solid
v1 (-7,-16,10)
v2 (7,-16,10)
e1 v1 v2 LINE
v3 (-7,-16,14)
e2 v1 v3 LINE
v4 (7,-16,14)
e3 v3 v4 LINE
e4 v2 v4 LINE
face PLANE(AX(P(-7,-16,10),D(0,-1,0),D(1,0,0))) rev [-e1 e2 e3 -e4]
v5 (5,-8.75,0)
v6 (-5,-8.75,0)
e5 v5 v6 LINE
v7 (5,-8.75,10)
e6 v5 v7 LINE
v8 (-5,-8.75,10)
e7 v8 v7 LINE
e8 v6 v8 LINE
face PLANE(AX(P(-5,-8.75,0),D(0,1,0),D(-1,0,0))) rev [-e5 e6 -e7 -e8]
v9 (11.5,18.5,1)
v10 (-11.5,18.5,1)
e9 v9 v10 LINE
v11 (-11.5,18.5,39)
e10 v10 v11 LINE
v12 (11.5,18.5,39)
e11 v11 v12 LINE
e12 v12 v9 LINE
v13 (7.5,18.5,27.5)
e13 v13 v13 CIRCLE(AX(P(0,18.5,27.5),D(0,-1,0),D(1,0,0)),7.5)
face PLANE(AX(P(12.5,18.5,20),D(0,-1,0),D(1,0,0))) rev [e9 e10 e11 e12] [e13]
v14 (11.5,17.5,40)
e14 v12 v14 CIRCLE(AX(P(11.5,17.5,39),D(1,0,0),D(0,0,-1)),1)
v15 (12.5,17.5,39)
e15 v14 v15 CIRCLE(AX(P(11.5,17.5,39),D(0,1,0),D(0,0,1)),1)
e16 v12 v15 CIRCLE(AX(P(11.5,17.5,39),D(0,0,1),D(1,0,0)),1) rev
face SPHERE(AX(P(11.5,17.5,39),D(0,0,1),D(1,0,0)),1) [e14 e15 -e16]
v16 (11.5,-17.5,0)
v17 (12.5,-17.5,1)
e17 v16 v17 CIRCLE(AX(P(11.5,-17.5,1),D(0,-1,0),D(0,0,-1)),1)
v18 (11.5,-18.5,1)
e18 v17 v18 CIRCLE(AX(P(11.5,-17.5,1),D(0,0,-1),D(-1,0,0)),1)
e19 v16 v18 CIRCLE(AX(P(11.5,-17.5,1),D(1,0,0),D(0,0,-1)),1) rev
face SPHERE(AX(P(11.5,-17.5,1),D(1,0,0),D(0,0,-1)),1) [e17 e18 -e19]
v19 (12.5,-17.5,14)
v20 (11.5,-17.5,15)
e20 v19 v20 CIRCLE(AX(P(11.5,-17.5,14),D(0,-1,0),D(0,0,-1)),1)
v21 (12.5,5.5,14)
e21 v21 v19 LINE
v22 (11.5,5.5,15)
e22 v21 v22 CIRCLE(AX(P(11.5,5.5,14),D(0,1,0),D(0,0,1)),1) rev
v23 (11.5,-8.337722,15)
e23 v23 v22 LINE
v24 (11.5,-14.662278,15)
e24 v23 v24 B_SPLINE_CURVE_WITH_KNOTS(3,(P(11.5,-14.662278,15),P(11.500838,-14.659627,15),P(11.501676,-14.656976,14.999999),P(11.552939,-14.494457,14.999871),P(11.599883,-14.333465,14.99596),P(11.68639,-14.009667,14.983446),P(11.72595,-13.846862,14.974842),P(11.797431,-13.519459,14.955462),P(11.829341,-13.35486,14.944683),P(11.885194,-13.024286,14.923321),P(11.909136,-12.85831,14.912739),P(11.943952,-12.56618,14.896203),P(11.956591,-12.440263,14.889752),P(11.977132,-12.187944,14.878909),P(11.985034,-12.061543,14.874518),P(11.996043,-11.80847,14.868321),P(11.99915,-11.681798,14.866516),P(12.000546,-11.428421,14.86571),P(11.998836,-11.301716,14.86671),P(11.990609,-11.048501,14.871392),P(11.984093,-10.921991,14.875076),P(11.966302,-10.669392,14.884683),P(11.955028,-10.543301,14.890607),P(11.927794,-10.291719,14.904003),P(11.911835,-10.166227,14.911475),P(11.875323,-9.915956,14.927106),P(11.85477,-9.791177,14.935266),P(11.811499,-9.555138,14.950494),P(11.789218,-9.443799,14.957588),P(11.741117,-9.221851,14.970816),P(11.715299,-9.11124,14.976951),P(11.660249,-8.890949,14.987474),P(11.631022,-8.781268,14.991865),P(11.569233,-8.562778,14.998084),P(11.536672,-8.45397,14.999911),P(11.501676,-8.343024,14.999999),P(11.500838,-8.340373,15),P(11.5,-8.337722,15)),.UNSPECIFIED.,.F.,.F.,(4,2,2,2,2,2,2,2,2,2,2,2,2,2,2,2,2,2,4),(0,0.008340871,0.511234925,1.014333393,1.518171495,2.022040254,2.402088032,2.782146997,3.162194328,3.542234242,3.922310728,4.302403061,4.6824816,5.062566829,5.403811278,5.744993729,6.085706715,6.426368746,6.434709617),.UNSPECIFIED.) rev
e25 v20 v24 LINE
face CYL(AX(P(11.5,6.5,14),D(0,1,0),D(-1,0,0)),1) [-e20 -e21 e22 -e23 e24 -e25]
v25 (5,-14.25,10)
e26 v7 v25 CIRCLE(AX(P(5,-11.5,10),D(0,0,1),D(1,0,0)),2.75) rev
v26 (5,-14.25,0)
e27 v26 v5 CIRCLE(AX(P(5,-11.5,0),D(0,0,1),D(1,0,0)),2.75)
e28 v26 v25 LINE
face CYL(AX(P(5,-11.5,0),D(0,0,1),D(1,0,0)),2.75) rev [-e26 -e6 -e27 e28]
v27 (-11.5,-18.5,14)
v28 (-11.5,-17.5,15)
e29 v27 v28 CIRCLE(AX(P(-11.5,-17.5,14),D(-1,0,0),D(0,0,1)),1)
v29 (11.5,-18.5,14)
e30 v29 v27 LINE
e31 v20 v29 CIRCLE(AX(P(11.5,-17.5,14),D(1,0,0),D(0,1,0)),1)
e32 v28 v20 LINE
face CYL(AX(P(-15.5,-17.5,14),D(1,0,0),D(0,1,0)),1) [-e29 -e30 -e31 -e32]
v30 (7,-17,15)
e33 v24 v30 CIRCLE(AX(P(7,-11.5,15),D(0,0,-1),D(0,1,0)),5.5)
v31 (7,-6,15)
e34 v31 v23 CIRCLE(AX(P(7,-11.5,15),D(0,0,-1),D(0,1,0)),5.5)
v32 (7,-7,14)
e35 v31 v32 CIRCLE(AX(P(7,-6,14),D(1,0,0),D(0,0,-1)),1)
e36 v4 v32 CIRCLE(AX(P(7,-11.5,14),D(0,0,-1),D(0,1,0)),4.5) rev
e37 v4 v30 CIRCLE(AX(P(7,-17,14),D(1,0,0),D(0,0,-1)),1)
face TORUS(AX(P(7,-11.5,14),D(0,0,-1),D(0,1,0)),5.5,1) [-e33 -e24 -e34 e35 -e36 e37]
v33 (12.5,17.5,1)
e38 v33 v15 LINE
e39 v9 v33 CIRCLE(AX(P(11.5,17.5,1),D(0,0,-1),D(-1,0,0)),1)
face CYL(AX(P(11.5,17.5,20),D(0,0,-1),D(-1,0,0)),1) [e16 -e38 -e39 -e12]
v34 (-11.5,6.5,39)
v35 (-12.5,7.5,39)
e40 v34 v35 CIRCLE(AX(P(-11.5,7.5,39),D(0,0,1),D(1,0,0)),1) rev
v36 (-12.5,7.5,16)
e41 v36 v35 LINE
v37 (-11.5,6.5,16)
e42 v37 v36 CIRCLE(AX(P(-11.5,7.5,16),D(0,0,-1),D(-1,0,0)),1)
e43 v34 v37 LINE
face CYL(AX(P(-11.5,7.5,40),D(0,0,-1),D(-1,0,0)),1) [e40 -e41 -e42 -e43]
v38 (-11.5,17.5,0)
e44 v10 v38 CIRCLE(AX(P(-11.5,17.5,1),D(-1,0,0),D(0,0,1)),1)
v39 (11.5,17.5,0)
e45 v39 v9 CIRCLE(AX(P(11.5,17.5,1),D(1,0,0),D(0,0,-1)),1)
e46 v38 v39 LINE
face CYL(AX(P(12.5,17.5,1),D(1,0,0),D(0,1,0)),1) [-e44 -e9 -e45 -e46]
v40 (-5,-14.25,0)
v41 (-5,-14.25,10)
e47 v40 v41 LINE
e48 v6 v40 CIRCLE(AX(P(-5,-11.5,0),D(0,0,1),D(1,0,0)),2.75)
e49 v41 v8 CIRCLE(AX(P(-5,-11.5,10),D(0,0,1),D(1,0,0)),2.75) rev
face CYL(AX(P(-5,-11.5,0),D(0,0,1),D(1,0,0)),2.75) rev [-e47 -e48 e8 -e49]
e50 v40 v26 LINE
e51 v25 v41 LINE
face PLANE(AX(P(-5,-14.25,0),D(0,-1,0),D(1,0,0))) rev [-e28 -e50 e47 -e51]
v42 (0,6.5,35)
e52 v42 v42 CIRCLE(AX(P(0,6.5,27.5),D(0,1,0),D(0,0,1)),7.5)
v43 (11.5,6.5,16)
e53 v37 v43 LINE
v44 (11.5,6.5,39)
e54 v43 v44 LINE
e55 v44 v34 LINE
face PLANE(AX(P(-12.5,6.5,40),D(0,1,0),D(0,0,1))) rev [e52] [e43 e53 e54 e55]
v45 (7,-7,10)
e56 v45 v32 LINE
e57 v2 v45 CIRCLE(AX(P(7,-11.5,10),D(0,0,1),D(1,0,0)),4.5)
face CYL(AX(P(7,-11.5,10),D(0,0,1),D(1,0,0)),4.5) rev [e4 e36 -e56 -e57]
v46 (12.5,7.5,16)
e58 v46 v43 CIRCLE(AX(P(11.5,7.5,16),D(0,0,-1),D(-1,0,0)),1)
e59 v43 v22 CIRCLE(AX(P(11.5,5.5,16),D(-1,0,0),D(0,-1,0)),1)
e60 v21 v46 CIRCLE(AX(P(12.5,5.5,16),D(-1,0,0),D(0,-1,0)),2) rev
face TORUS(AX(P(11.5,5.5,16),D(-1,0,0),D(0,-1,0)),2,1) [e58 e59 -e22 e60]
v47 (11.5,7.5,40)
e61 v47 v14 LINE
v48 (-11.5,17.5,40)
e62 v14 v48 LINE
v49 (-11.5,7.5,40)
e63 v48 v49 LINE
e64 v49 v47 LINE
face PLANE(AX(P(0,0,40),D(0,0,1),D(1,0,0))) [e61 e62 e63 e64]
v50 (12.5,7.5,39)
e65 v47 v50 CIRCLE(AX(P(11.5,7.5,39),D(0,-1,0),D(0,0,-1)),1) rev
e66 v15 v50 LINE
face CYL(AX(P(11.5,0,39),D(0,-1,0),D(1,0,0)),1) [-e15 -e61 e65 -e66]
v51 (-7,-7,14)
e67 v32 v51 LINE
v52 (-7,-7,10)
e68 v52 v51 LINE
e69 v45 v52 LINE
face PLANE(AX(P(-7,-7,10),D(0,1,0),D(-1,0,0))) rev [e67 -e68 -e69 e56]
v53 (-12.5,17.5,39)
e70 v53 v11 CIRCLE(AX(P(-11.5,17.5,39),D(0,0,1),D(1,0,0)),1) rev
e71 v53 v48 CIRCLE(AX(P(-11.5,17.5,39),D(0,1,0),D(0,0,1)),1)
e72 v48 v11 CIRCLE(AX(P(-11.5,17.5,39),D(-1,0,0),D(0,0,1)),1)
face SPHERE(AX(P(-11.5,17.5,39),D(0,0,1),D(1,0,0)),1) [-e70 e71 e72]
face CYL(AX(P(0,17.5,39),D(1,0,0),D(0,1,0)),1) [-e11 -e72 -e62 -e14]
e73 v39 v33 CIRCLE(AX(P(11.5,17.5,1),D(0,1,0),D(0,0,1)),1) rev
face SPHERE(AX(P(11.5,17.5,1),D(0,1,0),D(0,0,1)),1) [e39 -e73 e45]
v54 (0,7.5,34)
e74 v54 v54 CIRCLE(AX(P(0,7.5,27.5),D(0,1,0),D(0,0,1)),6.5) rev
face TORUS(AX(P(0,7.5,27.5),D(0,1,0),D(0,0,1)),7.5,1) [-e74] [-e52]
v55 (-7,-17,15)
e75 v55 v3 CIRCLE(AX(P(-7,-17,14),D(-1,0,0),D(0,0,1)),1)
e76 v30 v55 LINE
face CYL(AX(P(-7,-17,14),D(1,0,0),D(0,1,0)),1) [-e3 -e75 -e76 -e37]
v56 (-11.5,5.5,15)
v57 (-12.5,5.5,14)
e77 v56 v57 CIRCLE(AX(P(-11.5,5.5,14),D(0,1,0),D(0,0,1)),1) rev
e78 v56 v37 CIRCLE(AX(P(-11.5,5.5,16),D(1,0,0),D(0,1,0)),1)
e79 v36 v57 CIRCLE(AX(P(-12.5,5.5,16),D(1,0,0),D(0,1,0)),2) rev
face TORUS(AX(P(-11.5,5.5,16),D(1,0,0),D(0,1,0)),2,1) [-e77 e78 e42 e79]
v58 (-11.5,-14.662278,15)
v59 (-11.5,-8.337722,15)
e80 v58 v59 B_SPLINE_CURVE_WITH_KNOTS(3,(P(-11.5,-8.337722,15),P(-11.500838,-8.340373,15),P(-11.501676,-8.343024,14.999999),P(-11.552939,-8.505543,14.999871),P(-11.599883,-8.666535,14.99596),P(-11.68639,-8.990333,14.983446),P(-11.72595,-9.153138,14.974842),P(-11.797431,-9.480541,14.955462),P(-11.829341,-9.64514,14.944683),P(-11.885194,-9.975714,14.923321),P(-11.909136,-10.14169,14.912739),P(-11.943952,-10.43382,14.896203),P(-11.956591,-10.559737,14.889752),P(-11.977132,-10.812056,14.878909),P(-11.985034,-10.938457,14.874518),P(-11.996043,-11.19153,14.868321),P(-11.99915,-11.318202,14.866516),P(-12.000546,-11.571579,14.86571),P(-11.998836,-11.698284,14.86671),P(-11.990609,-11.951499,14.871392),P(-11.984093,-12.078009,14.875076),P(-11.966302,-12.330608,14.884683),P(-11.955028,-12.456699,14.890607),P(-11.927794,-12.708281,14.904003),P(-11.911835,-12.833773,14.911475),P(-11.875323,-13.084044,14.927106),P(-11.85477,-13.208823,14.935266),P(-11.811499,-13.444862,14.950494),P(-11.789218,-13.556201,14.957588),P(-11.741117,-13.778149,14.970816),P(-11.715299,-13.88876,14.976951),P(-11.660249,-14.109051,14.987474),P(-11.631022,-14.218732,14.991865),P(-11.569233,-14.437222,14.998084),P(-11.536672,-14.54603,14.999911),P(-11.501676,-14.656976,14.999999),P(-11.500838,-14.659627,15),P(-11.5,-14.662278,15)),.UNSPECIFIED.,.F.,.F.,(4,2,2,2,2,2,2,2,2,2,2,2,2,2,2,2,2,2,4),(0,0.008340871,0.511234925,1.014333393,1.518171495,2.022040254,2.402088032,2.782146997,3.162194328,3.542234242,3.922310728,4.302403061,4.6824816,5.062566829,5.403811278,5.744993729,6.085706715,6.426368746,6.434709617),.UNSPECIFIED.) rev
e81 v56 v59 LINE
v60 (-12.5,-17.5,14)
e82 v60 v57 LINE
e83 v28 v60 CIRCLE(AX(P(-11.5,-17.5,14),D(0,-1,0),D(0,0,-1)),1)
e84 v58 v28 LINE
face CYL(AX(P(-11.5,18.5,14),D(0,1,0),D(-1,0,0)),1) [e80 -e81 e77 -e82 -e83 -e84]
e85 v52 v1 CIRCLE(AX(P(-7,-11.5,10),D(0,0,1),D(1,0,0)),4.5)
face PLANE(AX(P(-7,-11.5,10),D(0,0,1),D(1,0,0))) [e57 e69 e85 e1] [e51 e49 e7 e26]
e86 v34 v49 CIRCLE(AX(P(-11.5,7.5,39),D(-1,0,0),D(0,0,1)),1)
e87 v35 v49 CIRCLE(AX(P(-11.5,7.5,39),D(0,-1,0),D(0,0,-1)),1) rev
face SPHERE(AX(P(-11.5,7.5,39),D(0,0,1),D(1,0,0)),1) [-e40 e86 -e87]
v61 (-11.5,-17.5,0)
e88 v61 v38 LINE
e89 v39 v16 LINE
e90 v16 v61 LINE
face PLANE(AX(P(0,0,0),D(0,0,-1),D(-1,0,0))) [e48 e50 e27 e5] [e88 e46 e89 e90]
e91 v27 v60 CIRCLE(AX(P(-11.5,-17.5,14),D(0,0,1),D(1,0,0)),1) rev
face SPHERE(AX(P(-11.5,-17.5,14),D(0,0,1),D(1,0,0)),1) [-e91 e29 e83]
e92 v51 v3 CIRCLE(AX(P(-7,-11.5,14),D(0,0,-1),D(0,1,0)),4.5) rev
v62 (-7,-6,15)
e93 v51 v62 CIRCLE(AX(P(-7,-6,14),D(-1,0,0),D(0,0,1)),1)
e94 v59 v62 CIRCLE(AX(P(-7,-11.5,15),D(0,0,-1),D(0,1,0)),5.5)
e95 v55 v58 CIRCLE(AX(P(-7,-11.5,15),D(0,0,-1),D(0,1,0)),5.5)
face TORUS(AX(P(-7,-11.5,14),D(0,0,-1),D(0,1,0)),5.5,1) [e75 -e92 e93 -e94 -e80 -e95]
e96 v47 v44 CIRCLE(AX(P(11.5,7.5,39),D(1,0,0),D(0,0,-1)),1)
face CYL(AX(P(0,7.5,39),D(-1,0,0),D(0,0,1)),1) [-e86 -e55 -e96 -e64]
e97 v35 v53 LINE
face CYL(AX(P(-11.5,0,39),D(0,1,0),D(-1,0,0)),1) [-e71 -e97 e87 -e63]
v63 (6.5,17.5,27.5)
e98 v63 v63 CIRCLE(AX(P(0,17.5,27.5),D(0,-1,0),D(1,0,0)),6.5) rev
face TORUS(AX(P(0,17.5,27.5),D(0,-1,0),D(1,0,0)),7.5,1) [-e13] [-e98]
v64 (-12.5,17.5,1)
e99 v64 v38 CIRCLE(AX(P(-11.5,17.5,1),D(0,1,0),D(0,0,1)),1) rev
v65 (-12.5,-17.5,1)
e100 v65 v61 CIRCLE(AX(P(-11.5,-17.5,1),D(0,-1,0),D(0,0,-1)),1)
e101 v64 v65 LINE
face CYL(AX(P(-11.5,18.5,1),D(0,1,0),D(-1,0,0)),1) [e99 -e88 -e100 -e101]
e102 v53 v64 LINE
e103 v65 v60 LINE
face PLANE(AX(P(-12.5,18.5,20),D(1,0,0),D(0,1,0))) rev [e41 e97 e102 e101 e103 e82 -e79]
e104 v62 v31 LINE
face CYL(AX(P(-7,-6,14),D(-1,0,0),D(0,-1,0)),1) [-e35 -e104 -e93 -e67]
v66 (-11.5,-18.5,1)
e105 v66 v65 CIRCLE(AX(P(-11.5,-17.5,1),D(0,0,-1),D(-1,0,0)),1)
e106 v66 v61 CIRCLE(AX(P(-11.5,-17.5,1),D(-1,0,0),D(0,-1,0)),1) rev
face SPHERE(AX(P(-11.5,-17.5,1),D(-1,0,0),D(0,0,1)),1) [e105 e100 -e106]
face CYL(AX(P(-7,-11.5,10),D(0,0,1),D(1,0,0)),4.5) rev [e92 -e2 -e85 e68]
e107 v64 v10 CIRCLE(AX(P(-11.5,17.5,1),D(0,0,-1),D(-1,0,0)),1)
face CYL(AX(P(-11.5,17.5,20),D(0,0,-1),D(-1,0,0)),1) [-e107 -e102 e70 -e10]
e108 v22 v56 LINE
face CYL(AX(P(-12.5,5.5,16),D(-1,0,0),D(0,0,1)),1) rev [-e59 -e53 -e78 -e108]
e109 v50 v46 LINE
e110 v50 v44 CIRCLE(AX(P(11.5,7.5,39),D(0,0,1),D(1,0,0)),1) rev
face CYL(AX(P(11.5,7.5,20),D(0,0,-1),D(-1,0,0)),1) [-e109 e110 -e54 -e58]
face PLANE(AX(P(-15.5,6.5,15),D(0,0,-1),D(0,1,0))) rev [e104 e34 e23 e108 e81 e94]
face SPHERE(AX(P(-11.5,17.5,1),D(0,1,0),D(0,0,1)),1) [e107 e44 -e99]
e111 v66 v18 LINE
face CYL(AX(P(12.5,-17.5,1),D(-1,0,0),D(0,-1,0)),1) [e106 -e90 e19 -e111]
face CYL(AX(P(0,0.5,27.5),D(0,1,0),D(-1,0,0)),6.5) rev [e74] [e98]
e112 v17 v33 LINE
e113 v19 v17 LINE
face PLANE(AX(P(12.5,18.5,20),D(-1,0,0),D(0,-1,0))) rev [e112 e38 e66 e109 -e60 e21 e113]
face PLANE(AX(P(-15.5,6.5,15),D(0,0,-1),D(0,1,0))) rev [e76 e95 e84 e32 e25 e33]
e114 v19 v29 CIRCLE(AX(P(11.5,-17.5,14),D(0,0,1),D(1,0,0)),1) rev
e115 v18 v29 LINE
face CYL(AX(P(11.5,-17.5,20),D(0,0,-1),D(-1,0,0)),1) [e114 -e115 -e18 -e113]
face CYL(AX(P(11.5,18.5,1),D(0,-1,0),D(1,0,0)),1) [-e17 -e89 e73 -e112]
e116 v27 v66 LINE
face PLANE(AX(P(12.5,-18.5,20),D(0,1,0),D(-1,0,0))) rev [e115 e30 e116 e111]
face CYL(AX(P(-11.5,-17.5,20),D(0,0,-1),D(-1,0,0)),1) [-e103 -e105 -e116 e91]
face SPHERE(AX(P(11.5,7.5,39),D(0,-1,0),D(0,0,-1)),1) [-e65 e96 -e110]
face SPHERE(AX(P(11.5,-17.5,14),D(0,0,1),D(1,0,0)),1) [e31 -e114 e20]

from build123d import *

# Parameters (mm, degrees)
CROQUIS1_W              = 25
CROQUIS1_H              = 37
SALIENTE_EXTRUIR1_DEPTH = 20
CROQUIS2_W              = 25
CROQUIS2_H              = 12
SALIENTE_EXTRUIR2_DEPTH = 20
CORTAR_EXTRUIR1_DEPTH   = 20
CORTAR_EXTRUIR2_DEPTH   = 10
CROQUIS5_R              = 6.5
CORTAR_EXTRUIR3_DEPTH   = 18
CROQUIS6_W              = 5
CROQUIS6_H              = 25
CORTAR_EXTRUIR4_DEPTH   = 28
REDONDEO1_R             = 1


with BuildPart() as part:
    # Croquis1 → Saliente-Extruir1 (new body)
    with BuildSketch(Plane.XY):
        Rectangle(CROQUIS1_W, CROQUIS1_H)
    extrude(amount=SALIENTE_EXTRUIR1_DEPTH)

    # Croquis2 → Saliente-Extruir2 (add)
    with BuildSketch(Plane.XY.offset(20)):
        with Locations((0, 12.5)):
            Rectangle(CROQUIS2_W, CROQUIS2_H)
    extrude(amount=SALIENTE_EXTRUIR2_DEPTH)

    # Croquis3 → Cortar-Extruir1 (cut)
    with BuildSketch(Plane.XY.offset(20)):
        with BuildLine():
            Line((-5, -8.75), (5, -8.75))
            ThreePointArc((5, -8.75), (7.75, -11.5), (5, -14.25))
            Line((5, -14.25), (-5, -14.25))
            ThreePointArc((-5, -14.25), (-7.75, -11.5), (-5, -8.75))
        make_face()
    extrude(amount=-CORTAR_EXTRUIR1_DEPTH, mode=Mode.SUBTRACT)

    # Croquis4 → Cortar-Extruir2 (cut)
    with BuildSketch(Plane.XY.offset(20)):
        with BuildLine():
            Line((-7, -7), (7, -7))
            ThreePointArc((7, -7), (11.5, -11.5), (7, -16))
            Line((7, -16), (-7, -16))
            ThreePointArc((-7, -16), (-11.5, -11.5), (-7, -7))
        make_face()
    extrude(amount=-CORTAR_EXTRUIR2_DEPTH, mode=Mode.SUBTRACT)

    # Croquis5 → Cortar-Extruir3 (cut)
    with BuildSketch(Plane(origin=(0, 18.5, 0), x_dir=(1, 0, 0), z_dir=(0, 1, 0))):
        with Locations(Location((0, -27.5, 0), (0, 0, 180))):
            Circle(CROQUIS5_R)
    extrude(amount=-CORTAR_EXTRUIR3_DEPTH, mode=Mode.SUBTRACT)

    # Croquis6 → Cortar-Extruir4 (cut)
    with BuildSketch(Plane(origin=(12.5, 0, 0), x_dir=(0, 0, -1), z_dir=(1, 0, 0))):
        with Locations((-17.5, -6)):
            Rectangle(CROQUIS6_W, CROQUIS6_H)
    extrude(amount=-CORTAR_EXTRUIR4_DEPTH, mode=Mode.SUBTRACT)

    # Redondeo1
    # the kernel refuses this fillet: 1 mm, written as the material it adds along each edge
    with BuildSketch(Plane(origin=(12.5, 6.5, 15), x_dir=(0, 0, 1), z_dir=(-1, 0, 0))) as redondeo1_piece_1:
        with BuildLine():
            CenterArc((REDONDEO1_R, -REDONDEO1_R), REDONDEO1_R, 90, 90)
            Line((0, -REDONDEO1_R), (0, 0))
            Line((0, 0), (REDONDEO1_R, 0))
        make_face()
    extrude(amount=25)
    # the kernel refuses this fillet: 1 mm, written as the material it takes off along each edge
    with BuildSketch(Plane(origin=(-11.5, 17.5, 39), x_dir=(0, 0, 1), z_dir=(0, 1, 0))) as redondeo1_2_piece_1_section:
        Polygon((0, 0), (REDONDEO1_R, 0), (REDONDEO1_R, -REDONDEO1_R), (0, -REDONDEO1_R), align=None)
    redondeo1_2_piece_1 = extrude(amount=REDONDEO1_R, mode=Mode.PRIVATE)
    redondeo1_2_piece_1 = redondeo1_2_piece_1 - Plane(origin=(-11.5, 17.5, 39), x_dir=(0.7071067811865475, 0, -0.7071067811865475), z_dir=(0, 1, 0)) * Sphere(REDONDEO1_R, mode=Mode.PRIVATE)
    add(redondeo1_2_piece_1, mode=Mode.SUBTRACT)
    with BuildSketch(Plane(origin=(11.5, 17.5, 39), x_dir=(1, 0, 0), z_dir=(0, 1, 0))) as redondeo1_2_piece_2_section:
        Polygon((0, 0), (REDONDEO1_R, 0), (REDONDEO1_R, -REDONDEO1_R), (0, -REDONDEO1_R), align=None)
    redondeo1_2_piece_2 = extrude(amount=REDONDEO1_R, mode=Mode.PRIVATE)
    redondeo1_2_piece_2 = redondeo1_2_piece_2 - Plane(origin=(11.5, 17.5, 39), x_dir=(-0.7071067811865475, 0, -0.7071067811865475), z_dir=(0, 1, 0)) * Sphere(REDONDEO1_R, mode=Mode.PRIVATE)
    add(redondeo1_2_piece_2, mode=Mode.SUBTRACT)
    with BuildSketch(Plane(origin=(11.5, 17.5, 1), x_dir=(1, 0, 0), z_dir=(0, 1, 0))) as redondeo1_2_piece_3_section:
        Polygon((0, 0), (REDONDEO1_R, 0), (REDONDEO1_R, REDONDEO1_R), (0, REDONDEO1_R), align=None)
    redondeo1_2_piece_3 = extrude(amount=REDONDEO1_R, mode=Mode.PRIVATE)
    redondeo1_2_piece_3 = redondeo1_2_piece_3 - Plane(origin=(11.5, 17.5, 1), x_dir=(-0.7071067811865475, 0, 0.7071067811865475), z_dir=(0, 1, 0)) * Sphere(REDONDEO1_R, mode=Mode.PRIVATE)
    add(redondeo1_2_piece_3, mode=Mode.SUBTRACT)
    with BuildSketch(Plane(origin=(-11.5, 17.5, 1), x_dir=(0, 0, -1), z_dir=(0, 1, 0))) as redondeo1_2_piece_4_section:
        Polygon((0, 0), (REDONDEO1_R, 0), (REDONDEO1_R, REDONDEO1_R), (0, REDONDEO1_R), align=None)
    redondeo1_2_piece_4 = extrude(amount=REDONDEO1_R, mode=Mode.PRIVATE)
    redondeo1_2_piece_4 = redondeo1_2_piece_4 - Plane(origin=(-11.5, 17.5, 1), x_dir=(0.7071067811865475, 0, 0.7071067811865475), z_dir=(0, 1, 0)) * Sphere(REDONDEO1_R, mode=Mode.PRIVATE)
    add(redondeo1_2_piece_4, mode=Mode.SUBTRACT)
    with BuildSketch(Plane(origin=(11.5, -17.5, 1), x_dir=(0, 0, -1), z_dir=(1, 0, 0))) as redondeo1_2_piece_5_section:
        Polygon((0, 0), (REDONDEO1_R, 0), (REDONDEO1_R, -REDONDEO1_R), (0, -REDONDEO1_R), align=None)
    redondeo1_2_piece_5 = extrude(amount=REDONDEO1_R, mode=Mode.PRIVATE)
    redondeo1_2_piece_5 = redondeo1_2_piece_5 - Plane(origin=(11.5, -17.5, 1), x_dir=(0, 0.7071067811865475, 0.7071067811865475), z_dir=(1, 0, 0)) * Sphere(REDONDEO1_R, mode=Mode.PRIVATE)
    add(redondeo1_2_piece_5, mode=Mode.SUBTRACT)
    with BuildSketch(Plane(origin=(-11.5, -17.5, 1), x_dir=(-1, 0, 0), z_dir=(0, 0, -1))) as redondeo1_2_piece_6_section:
        Polygon((0, 0), (REDONDEO1_R, 0), (REDONDEO1_R, -REDONDEO1_R), (0, -REDONDEO1_R), align=None)
    redondeo1_2_piece_6 = extrude(amount=REDONDEO1_R, mode=Mode.PRIVATE)
    redondeo1_2_piece_6 = redondeo1_2_piece_6 - Plane(origin=(-11.5, -17.5, 1), x_dir=(0.7071067811865474, 0.7071067811865477, 0), z_dir=(0, 0, -1)) * Sphere(REDONDEO1_R, mode=Mode.PRIVATE)
    add(redondeo1_2_piece_6, mode=Mode.SUBTRACT)
    with BuildSketch(Plane(origin=(-12.5, 4, 40), x_dir=(1, 0, 0), z_dir=(0, 1, 0))) as redondeo1_2_piece_7:
        with BuildLine():
            CenterArc((REDONDEO1_R, REDONDEO1_R), REDONDEO1_R, 180, 90)
            Line((0, REDONDEO1_R), (0, 0))
            Line((0, 0), (REDONDEO1_R, 0))
        make_face()
    extrude(amount=13.5, mode=Mode.SUBTRACT)
    with BuildSketch(Plane(origin=(15, 6.5, 40), x_dir=(0, 1, 0), z_dir=(-1, 0, 0))) as redondeo1_2_piece_8:
        with BuildLine():
            CenterArc((REDONDEO1_R, REDONDEO1_R), REDONDEO1_R, 180, 90)
            Line((0, REDONDEO1_R), (0, 0))
            Line((0, 0), (REDONDEO1_R, 0))
        make_face()
    extrude(amount=30, mode=Mode.SUBTRACT)
    with BuildSketch(Plane(origin=(12.5, 17.5, 40), x_dir=(0, 0, -1), z_dir=(0, -1, 0))) as redondeo1_2_piece_9:
        with BuildLine():
            CenterArc((REDONDEO1_R, -REDONDEO1_R), REDONDEO1_R, 90, 90)
            Line((0, -REDONDEO1_R), (0, 0))
            Line((0, 0), (REDONDEO1_R, 0))
        make_face()
    extrude(amount=13.5, mode=Mode.SUBTRACT)
    with BuildSketch(Plane(origin=(-11.5, 18.5, 40), x_dir=(0, 0, -1), z_dir=(1, 0, 0)), Plane(origin=(11.5, 18.5, 0), x_dir=(0, 0, 1), z_dir=(-1, 0, 0))) as redondeo1_2_piece_10:
        with BuildLine():
            CenterArc((REDONDEO1_R, -REDONDEO1_R), REDONDEO1_R, 90, 90)
            Line((0, -REDONDEO1_R), (0, 0))
            Line((0, 0), (REDONDEO1_R, 0))
        make_face()
    extrude(amount=23, mode=Mode.SUBTRACT)
    with BuildSketch(Plane(origin=(12.5, -17.5, 0), x_dir=(0, 0, 1), z_dir=(0, 1, 0))) as redondeo1_2_piece_11:
        with BuildLine():
            CenterArc((REDONDEO1_R, -REDONDEO1_R), REDONDEO1_R, 90, 90)
            Line((0, -REDONDEO1_R), (0, 0))
            Line((0, 0), (REDONDEO1_R, 0))
        make_face()
    extrude(amount=35, mode=Mode.SUBTRACT)
    with BuildSketch(Plane(origin=(-11.5, -18.5, 0), x_dir=(0, 1, 0), z_dir=(1, 0, 0))) as redondeo1_2_piece_12:
        with BuildLine():
            CenterArc((REDONDEO1_R, REDONDEO1_R), REDONDEO1_R, 180, 90)
            Line((0, REDONDEO1_R), (0, 0))
            Line((0, 0), (REDONDEO1_R, 0))
        make_face()
    extrude(amount=23, mode=Mode.SUBTRACT)
    with BuildSketch(Plane(origin=(-12.5, 17.5, 0), x_dir=(1, 0, 0), z_dir=(0, -1, 0))) as redondeo1_2_piece_13:
        with BuildLine():
            CenterArc((REDONDEO1_R, REDONDEO1_R), REDONDEO1_R, 180, 90)
            Line((0, REDONDEO1_R), (0, 0))
            Line((0, 0), (REDONDEO1_R, 0))
        make_face()
    extrude(amount=35, mode=Mode.SUBTRACT)
    with BuildSketch(Plane(origin=(0, 6.5, 27.5), x_dir=(-1, 0, 0), z_dir=(0, 0, -1))) as redondeo1_2_piece_14:
        with BuildLine():
            CenterArc((6.5 + REDONDEO1_R, REDONDEO1_R), REDONDEO1_R, 180, 90)
            Line((6.5 + REDONDEO1_R, 0), (6.5, 0))
            Line((6.5, 0), (6.5, REDONDEO1_R))
        make_face()
    revolve(axis=Axis((0, 6.5, 27.5), (0, 1, 0)), mode=Mode.SUBTRACT)
    with BuildSketch(Plane(origin=(0, 18.5, 27.5), x_dir=(-1, 0, 0), z_dir=(0, 0, -1))) as redondeo1_2_piece_15:
        with BuildLine():
            CenterArc((6.5 + REDONDEO1_R, -REDONDEO1_R), REDONDEO1_R, 90, 90)
            Line((6.5, -REDONDEO1_R), (6.5, 0))
            Line((6.5, 0), (6.5 + REDONDEO1_R, 0))
        make_face()
    revolve(axis=Axis((0, 18.5, 27.5), (0, 1, 0)), mode=Mode.SUBTRACT)
    with BuildSketch(Plane(origin=(-12.5, 18.5, 1), x_dir=(1, 0, 0), z_dir=(0, 0, 1)), Plane(origin=(12.5, 18.5, 39), x_dir=(-1, 0, 0), z_dir=(0, 0, -1))) as redondeo1_2_piece_16:
        with BuildLine():
            CenterArc((REDONDEO1_R, -REDONDEO1_R), REDONDEO1_R, 90, 90)
            Line((0, -REDONDEO1_R), (0, 0))
            Line((0, 0), (REDONDEO1_R, 0))
        make_face()
    extrude(amount=38, mode=Mode.SUBTRACT)
    with BuildSketch(Plane(origin=(-7, -16, 15), x_dir=(0, -1, 0), z_dir=(1, 0, 0)), Plane(origin=(7, -7, 15), x_dir=(0, 1, 0), z_dir=(-1, 0, 0))) as redondeo1_2_piece_17:
        with BuildLine():
            CenterArc((REDONDEO1_R, REDONDEO1_R), REDONDEO1_R, 180, 90)
            Line((0, REDONDEO1_R), (0, 0))
            Line((0, 0), (REDONDEO1_R, 0))
        make_face()
    extrude(amount=14, mode=Mode.SUBTRACT)
    with BuildSketch(Plane(origin=(12.5, -18.5, 1), x_dir=(0, 1, 0), z_dir=(0, 0, 1))) as redondeo1_2_piece_18:
        with BuildLine():
            CenterArc((REDONDEO1_R, REDONDEO1_R), REDONDEO1_R, 180, 90)
            Line((0, REDONDEO1_R), (0, 0))
            Line((0, 0), (REDONDEO1_R, 0))
        make_face()
    extrude(amount=16.5, mode=Mode.SUBTRACT)
    with BuildSketch(Plane(origin=(-12.5, -18.5, 1), x_dir=(0, 1, 0), z_dir=(0, 0, 1))) as redondeo1_2_piece_19:
        with BuildLine():
            CenterArc((REDONDEO1_R, -REDONDEO1_R), REDONDEO1_R, 90, 90)
            Line((0, -REDONDEO1_R), (0, 0))
            Line((0, 0), (REDONDEO1_R, 0))
        make_face()
    extrude(amount=16.5, mode=Mode.SUBTRACT)
    with BuildSketch(Plane(origin=(15, -18.5, 15), x_dir=(0, 0, -1), z_dir=(-1, 0, 0))) as redondeo1_2_piece_20:
        with BuildLine():
            CenterArc((REDONDEO1_R, -REDONDEO1_R), REDONDEO1_R, 90, 90)
            Line((0, -REDONDEO1_R), (0, 0))
            Line((0, 0), (REDONDEO1_R, 0))
        make_face()
    extrude(amount=30, mode=Mode.SUBTRACT)
    with BuildSketch(Plane(origin=(-7, -11.5, 15), x_dir=(0, 1, 0), z_dir=(1, 0, 0))) as redondeo1_2_piece_21:
        with BuildLine():
            CenterArc((4.5 + REDONDEO1_R, -REDONDEO1_R), REDONDEO1_R, 90, 90)
            Line((4.5, -REDONDEO1_R), (4.5, 0))
            Line((4.5, 0), (4.5 + REDONDEO1_R, 0))
        make_face()
    revolve(axis=Axis((-7, -11.5, 15), (0, 0, 1)), revolution_arc=180, mode=Mode.SUBTRACT)
    with BuildSketch(Plane(origin=(7, -11.5, 15), x_dir=(0, -1, 0), z_dir=(-1, 0, 0))) as redondeo1_2_piece_22:
        with BuildLine():
            CenterArc((4.5 + REDONDEO1_R, -REDONDEO1_R), REDONDEO1_R, 90, 90)
            Line((4.5, -REDONDEO1_R), (4.5, 0))
            Line((4.5, 0), (4.5 + REDONDEO1_R, 0))
        make_face()
    revolve(axis=Axis((7, -11.5, 15), (0, 0, 1)), revolution_arc=180, mode=Mode.SUBTRACT)
    # the kernel refuses this fillet: 1 mm, written as the material it takes off along each edge
    with BuildSketch(Plane(origin=(11.5, -17.5, 14), x_dir=(0, 0, 1), z_dir=(1, 0, 0))) as redondeo1_3_piece_1_section:
        Polygon((0, 0), (REDONDEO1_R, 0), (REDONDEO1_R, REDONDEO1_R), (0, REDONDEO1_R), align=None)
    redondeo1_3_piece_1 = extrude(amount=REDONDEO1_R, mode=Mode.PRIVATE)
    redondeo1_3_piece_1 = redondeo1_3_piece_1 - Plane(origin=(11.5, -17.5, 14), x_dir=(0, 0.7071067811865475, -0.7071067811865475), z_dir=(1, 0, 0)) * Sphere(REDONDEO1_R, mode=Mode.PRIVATE)
    add(redondeo1_3_piece_1, mode=Mode.SUBTRACT)
    with BuildSketch(Plane(origin=(-11.5, -17.5, 14), x_dir=(0, 0, 1), z_dir=(-1, 0, 0))) as redondeo1_3_piece_2_section:
        Polygon((0, 0), (REDONDEO1_R, 0), (REDONDEO1_R, -REDONDEO1_R), (0, -REDONDEO1_R), align=None)
    redondeo1_3_piece_2 = extrude(amount=REDONDEO1_R, mode=Mode.PRIVATE)
    redondeo1_3_piece_2 = redondeo1_3_piece_2 - Plane(origin=(-11.5, -17.5, 14), x_dir=(0, 0.7071067811865475, -0.7071067811865475), z_dir=(-1, 0, 0)) * Sphere(REDONDEO1_R, mode=Mode.PRIVATE)
    add(redondeo1_3_piece_2, mode=Mode.SUBTRACT)
    with BuildSketch(Plane(origin=(11.5, 7.5, 39), x_dir=(0, -1, 0), z_dir=(1, 0, 0))) as redondeo1_3_piece_3_section:
        Polygon((0, 0), (REDONDEO1_R, 0), (REDONDEO1_R, -REDONDEO1_R), (0, -REDONDEO1_R), align=None)
    redondeo1_3_piece_3 = extrude(amount=REDONDEO1_R, mode=Mode.PRIVATE)
    redondeo1_3_piece_3 = redondeo1_3_piece_3 - Plane(origin=(11.5, 7.5, 39), x_dir=(0, 0.7071067811865475, -0.7071067811865475), z_dir=(1, 0, 0)) * Sphere(REDONDEO1_R, mode=Mode.PRIVATE)
    add(redondeo1_3_piece_3, mode=Mode.SUBTRACT)
    with BuildSketch(Plane(origin=(-11.5, 7.5, 39), x_dir=(0, -1, 0), z_dir=(-1, 0, 0))) as redondeo1_3_piece_4_section:
        Polygon((0, 0), (REDONDEO1_R, 0), (REDONDEO1_R, REDONDEO1_R), (0, REDONDEO1_R), align=None)
    redondeo1_3_piece_4 = extrude(amount=REDONDEO1_R, mode=Mode.PRIVATE)
    redondeo1_3_piece_4 = redondeo1_3_piece_4 - Plane(origin=(-11.5, 7.5, 39), x_dir=(0, 0.7071067811865475, -0.7071067811865475), z_dir=(-1, 0, 0)) * Sphere(REDONDEO1_R, mode=Mode.PRIVATE)
    add(redondeo1_3_piece_4, mode=Mode.SUBTRACT)
    with BuildSketch(Plane(origin=(-12.5, 6.5, 16), x_dir=(0, 1, 0), z_dir=(0, 0, 1)), Plane(origin=(12.5, 6.5, 39), x_dir=(0, 1, 0), z_dir=(0, 0, -1))) as redondeo1_3_piece_5:
        with BuildLine():
            CenterArc((REDONDEO1_R, -REDONDEO1_R), REDONDEO1_R, 90, 90)
            Line((0, -REDONDEO1_R), (0, 0))
            Line((0, 0), (REDONDEO1_R, 0))
        make_face()
    extrude(amount=23, mode=Mode.SUBTRACT)
    with BuildSketch(Plane(origin=(-12.5, -11.499999979, 15), x_dir=(0, 0, -1), z_dir=(0, -1, 0))) as redondeo1_3_piece_6:
        with BuildLine():
            CenterArc((REDONDEO1_R, REDONDEO1_R), REDONDEO1_R, 180, 90)
            Line((0, REDONDEO1_R), (0, 0))
            Line((0, 0), (REDONDEO1_R, 0))
        make_face()
    extrude(amount=6.000000021, mode=Mode.SUBTRACT)
    with BuildSketch(Plane(origin=(-12.5, 5.5, 15), x_dir=(0, 0, -1), z_dir=(0, -1, 0))) as redondeo1_3_piece_7:
        with BuildLine():
            CenterArc((REDONDEO1_R, REDONDEO1_R), REDONDEO1_R, 180, 90)
            Line((0, REDONDEO1_R), (0, 0))
            Line((0, 0), (REDONDEO1_R, 0))
        make_face()
    extrude(amount=16.999999979, mode=Mode.SUBTRACT)
    with BuildSketch(Plane(origin=(12.5, 5.5, 15), x_dir=(0, 0, -1), z_dir=(0, -1, 0))) as redondeo1_3_piece_8:
        with BuildLine():
            CenterArc((REDONDEO1_R, -REDONDEO1_R), REDONDEO1_R, 90, 90)
            Line((0, -REDONDEO1_R), (0, 0))
            Line((0, 0), (REDONDEO1_R, 0))
        make_face()
    extrude(amount=16.999999981, mode=Mode.SUBTRACT)
    with BuildSketch(Plane(origin=(12.5, -11.499999981, 15), x_dir=(0, 0, -1), z_dir=(0, -1, 0))) as redondeo1_3_piece_9:
        with BuildLine():
            CenterArc((REDONDEO1_R, -REDONDEO1_R), REDONDEO1_R, 90, 90)
            Line((0, -REDONDEO1_R), (0, 0))
            Line((0, 0), (REDONDEO1_R, 0))
        make_face()
    extrude(amount=6.000000019, mode=Mode.SUBTRACT)
    with BuildSketch(Plane(origin=(12.5, 5.5, 16), x_dir=(0, 1, 0), z_dir=(0, 0, 1))) as redondeo1_3_piece_10:
        with BuildLine():
            CenterArc((1 + REDONDEO1_R, REDONDEO1_R), REDONDEO1_R, 180, 90)
            Line((1, REDONDEO1_R), (1, 0))
            Line((1, 0), (1 + REDONDEO1_R, 0))
        make_face()
    revolve(axis=Axis((12.5, 5.5, 16), (-1, 0, 0)), revolution_arc=90, mode=Mode.SUBTRACT)
    with BuildSketch(Plane(origin=(-12.5, 5.5, 16), x_dir=(0, 1, 0), z_dir=(0, 0, 1))) as redondeo1_3_piece_11:
        with BuildLine():
            CenterArc((1 + REDONDEO1_R, -REDONDEO1_R), REDONDEO1_R, 90, 90)
            Line((1, -REDONDEO1_R), (1, 0))
            Line((1, 0), (1 + REDONDEO1_R, 0))
        make_face()
    revolve(axis=Axis((-12.5, 5.5, 16), (-1, 0, 0)), revolution_arc=90, mode=Mode.SUBTRACT)


solid = part.part
